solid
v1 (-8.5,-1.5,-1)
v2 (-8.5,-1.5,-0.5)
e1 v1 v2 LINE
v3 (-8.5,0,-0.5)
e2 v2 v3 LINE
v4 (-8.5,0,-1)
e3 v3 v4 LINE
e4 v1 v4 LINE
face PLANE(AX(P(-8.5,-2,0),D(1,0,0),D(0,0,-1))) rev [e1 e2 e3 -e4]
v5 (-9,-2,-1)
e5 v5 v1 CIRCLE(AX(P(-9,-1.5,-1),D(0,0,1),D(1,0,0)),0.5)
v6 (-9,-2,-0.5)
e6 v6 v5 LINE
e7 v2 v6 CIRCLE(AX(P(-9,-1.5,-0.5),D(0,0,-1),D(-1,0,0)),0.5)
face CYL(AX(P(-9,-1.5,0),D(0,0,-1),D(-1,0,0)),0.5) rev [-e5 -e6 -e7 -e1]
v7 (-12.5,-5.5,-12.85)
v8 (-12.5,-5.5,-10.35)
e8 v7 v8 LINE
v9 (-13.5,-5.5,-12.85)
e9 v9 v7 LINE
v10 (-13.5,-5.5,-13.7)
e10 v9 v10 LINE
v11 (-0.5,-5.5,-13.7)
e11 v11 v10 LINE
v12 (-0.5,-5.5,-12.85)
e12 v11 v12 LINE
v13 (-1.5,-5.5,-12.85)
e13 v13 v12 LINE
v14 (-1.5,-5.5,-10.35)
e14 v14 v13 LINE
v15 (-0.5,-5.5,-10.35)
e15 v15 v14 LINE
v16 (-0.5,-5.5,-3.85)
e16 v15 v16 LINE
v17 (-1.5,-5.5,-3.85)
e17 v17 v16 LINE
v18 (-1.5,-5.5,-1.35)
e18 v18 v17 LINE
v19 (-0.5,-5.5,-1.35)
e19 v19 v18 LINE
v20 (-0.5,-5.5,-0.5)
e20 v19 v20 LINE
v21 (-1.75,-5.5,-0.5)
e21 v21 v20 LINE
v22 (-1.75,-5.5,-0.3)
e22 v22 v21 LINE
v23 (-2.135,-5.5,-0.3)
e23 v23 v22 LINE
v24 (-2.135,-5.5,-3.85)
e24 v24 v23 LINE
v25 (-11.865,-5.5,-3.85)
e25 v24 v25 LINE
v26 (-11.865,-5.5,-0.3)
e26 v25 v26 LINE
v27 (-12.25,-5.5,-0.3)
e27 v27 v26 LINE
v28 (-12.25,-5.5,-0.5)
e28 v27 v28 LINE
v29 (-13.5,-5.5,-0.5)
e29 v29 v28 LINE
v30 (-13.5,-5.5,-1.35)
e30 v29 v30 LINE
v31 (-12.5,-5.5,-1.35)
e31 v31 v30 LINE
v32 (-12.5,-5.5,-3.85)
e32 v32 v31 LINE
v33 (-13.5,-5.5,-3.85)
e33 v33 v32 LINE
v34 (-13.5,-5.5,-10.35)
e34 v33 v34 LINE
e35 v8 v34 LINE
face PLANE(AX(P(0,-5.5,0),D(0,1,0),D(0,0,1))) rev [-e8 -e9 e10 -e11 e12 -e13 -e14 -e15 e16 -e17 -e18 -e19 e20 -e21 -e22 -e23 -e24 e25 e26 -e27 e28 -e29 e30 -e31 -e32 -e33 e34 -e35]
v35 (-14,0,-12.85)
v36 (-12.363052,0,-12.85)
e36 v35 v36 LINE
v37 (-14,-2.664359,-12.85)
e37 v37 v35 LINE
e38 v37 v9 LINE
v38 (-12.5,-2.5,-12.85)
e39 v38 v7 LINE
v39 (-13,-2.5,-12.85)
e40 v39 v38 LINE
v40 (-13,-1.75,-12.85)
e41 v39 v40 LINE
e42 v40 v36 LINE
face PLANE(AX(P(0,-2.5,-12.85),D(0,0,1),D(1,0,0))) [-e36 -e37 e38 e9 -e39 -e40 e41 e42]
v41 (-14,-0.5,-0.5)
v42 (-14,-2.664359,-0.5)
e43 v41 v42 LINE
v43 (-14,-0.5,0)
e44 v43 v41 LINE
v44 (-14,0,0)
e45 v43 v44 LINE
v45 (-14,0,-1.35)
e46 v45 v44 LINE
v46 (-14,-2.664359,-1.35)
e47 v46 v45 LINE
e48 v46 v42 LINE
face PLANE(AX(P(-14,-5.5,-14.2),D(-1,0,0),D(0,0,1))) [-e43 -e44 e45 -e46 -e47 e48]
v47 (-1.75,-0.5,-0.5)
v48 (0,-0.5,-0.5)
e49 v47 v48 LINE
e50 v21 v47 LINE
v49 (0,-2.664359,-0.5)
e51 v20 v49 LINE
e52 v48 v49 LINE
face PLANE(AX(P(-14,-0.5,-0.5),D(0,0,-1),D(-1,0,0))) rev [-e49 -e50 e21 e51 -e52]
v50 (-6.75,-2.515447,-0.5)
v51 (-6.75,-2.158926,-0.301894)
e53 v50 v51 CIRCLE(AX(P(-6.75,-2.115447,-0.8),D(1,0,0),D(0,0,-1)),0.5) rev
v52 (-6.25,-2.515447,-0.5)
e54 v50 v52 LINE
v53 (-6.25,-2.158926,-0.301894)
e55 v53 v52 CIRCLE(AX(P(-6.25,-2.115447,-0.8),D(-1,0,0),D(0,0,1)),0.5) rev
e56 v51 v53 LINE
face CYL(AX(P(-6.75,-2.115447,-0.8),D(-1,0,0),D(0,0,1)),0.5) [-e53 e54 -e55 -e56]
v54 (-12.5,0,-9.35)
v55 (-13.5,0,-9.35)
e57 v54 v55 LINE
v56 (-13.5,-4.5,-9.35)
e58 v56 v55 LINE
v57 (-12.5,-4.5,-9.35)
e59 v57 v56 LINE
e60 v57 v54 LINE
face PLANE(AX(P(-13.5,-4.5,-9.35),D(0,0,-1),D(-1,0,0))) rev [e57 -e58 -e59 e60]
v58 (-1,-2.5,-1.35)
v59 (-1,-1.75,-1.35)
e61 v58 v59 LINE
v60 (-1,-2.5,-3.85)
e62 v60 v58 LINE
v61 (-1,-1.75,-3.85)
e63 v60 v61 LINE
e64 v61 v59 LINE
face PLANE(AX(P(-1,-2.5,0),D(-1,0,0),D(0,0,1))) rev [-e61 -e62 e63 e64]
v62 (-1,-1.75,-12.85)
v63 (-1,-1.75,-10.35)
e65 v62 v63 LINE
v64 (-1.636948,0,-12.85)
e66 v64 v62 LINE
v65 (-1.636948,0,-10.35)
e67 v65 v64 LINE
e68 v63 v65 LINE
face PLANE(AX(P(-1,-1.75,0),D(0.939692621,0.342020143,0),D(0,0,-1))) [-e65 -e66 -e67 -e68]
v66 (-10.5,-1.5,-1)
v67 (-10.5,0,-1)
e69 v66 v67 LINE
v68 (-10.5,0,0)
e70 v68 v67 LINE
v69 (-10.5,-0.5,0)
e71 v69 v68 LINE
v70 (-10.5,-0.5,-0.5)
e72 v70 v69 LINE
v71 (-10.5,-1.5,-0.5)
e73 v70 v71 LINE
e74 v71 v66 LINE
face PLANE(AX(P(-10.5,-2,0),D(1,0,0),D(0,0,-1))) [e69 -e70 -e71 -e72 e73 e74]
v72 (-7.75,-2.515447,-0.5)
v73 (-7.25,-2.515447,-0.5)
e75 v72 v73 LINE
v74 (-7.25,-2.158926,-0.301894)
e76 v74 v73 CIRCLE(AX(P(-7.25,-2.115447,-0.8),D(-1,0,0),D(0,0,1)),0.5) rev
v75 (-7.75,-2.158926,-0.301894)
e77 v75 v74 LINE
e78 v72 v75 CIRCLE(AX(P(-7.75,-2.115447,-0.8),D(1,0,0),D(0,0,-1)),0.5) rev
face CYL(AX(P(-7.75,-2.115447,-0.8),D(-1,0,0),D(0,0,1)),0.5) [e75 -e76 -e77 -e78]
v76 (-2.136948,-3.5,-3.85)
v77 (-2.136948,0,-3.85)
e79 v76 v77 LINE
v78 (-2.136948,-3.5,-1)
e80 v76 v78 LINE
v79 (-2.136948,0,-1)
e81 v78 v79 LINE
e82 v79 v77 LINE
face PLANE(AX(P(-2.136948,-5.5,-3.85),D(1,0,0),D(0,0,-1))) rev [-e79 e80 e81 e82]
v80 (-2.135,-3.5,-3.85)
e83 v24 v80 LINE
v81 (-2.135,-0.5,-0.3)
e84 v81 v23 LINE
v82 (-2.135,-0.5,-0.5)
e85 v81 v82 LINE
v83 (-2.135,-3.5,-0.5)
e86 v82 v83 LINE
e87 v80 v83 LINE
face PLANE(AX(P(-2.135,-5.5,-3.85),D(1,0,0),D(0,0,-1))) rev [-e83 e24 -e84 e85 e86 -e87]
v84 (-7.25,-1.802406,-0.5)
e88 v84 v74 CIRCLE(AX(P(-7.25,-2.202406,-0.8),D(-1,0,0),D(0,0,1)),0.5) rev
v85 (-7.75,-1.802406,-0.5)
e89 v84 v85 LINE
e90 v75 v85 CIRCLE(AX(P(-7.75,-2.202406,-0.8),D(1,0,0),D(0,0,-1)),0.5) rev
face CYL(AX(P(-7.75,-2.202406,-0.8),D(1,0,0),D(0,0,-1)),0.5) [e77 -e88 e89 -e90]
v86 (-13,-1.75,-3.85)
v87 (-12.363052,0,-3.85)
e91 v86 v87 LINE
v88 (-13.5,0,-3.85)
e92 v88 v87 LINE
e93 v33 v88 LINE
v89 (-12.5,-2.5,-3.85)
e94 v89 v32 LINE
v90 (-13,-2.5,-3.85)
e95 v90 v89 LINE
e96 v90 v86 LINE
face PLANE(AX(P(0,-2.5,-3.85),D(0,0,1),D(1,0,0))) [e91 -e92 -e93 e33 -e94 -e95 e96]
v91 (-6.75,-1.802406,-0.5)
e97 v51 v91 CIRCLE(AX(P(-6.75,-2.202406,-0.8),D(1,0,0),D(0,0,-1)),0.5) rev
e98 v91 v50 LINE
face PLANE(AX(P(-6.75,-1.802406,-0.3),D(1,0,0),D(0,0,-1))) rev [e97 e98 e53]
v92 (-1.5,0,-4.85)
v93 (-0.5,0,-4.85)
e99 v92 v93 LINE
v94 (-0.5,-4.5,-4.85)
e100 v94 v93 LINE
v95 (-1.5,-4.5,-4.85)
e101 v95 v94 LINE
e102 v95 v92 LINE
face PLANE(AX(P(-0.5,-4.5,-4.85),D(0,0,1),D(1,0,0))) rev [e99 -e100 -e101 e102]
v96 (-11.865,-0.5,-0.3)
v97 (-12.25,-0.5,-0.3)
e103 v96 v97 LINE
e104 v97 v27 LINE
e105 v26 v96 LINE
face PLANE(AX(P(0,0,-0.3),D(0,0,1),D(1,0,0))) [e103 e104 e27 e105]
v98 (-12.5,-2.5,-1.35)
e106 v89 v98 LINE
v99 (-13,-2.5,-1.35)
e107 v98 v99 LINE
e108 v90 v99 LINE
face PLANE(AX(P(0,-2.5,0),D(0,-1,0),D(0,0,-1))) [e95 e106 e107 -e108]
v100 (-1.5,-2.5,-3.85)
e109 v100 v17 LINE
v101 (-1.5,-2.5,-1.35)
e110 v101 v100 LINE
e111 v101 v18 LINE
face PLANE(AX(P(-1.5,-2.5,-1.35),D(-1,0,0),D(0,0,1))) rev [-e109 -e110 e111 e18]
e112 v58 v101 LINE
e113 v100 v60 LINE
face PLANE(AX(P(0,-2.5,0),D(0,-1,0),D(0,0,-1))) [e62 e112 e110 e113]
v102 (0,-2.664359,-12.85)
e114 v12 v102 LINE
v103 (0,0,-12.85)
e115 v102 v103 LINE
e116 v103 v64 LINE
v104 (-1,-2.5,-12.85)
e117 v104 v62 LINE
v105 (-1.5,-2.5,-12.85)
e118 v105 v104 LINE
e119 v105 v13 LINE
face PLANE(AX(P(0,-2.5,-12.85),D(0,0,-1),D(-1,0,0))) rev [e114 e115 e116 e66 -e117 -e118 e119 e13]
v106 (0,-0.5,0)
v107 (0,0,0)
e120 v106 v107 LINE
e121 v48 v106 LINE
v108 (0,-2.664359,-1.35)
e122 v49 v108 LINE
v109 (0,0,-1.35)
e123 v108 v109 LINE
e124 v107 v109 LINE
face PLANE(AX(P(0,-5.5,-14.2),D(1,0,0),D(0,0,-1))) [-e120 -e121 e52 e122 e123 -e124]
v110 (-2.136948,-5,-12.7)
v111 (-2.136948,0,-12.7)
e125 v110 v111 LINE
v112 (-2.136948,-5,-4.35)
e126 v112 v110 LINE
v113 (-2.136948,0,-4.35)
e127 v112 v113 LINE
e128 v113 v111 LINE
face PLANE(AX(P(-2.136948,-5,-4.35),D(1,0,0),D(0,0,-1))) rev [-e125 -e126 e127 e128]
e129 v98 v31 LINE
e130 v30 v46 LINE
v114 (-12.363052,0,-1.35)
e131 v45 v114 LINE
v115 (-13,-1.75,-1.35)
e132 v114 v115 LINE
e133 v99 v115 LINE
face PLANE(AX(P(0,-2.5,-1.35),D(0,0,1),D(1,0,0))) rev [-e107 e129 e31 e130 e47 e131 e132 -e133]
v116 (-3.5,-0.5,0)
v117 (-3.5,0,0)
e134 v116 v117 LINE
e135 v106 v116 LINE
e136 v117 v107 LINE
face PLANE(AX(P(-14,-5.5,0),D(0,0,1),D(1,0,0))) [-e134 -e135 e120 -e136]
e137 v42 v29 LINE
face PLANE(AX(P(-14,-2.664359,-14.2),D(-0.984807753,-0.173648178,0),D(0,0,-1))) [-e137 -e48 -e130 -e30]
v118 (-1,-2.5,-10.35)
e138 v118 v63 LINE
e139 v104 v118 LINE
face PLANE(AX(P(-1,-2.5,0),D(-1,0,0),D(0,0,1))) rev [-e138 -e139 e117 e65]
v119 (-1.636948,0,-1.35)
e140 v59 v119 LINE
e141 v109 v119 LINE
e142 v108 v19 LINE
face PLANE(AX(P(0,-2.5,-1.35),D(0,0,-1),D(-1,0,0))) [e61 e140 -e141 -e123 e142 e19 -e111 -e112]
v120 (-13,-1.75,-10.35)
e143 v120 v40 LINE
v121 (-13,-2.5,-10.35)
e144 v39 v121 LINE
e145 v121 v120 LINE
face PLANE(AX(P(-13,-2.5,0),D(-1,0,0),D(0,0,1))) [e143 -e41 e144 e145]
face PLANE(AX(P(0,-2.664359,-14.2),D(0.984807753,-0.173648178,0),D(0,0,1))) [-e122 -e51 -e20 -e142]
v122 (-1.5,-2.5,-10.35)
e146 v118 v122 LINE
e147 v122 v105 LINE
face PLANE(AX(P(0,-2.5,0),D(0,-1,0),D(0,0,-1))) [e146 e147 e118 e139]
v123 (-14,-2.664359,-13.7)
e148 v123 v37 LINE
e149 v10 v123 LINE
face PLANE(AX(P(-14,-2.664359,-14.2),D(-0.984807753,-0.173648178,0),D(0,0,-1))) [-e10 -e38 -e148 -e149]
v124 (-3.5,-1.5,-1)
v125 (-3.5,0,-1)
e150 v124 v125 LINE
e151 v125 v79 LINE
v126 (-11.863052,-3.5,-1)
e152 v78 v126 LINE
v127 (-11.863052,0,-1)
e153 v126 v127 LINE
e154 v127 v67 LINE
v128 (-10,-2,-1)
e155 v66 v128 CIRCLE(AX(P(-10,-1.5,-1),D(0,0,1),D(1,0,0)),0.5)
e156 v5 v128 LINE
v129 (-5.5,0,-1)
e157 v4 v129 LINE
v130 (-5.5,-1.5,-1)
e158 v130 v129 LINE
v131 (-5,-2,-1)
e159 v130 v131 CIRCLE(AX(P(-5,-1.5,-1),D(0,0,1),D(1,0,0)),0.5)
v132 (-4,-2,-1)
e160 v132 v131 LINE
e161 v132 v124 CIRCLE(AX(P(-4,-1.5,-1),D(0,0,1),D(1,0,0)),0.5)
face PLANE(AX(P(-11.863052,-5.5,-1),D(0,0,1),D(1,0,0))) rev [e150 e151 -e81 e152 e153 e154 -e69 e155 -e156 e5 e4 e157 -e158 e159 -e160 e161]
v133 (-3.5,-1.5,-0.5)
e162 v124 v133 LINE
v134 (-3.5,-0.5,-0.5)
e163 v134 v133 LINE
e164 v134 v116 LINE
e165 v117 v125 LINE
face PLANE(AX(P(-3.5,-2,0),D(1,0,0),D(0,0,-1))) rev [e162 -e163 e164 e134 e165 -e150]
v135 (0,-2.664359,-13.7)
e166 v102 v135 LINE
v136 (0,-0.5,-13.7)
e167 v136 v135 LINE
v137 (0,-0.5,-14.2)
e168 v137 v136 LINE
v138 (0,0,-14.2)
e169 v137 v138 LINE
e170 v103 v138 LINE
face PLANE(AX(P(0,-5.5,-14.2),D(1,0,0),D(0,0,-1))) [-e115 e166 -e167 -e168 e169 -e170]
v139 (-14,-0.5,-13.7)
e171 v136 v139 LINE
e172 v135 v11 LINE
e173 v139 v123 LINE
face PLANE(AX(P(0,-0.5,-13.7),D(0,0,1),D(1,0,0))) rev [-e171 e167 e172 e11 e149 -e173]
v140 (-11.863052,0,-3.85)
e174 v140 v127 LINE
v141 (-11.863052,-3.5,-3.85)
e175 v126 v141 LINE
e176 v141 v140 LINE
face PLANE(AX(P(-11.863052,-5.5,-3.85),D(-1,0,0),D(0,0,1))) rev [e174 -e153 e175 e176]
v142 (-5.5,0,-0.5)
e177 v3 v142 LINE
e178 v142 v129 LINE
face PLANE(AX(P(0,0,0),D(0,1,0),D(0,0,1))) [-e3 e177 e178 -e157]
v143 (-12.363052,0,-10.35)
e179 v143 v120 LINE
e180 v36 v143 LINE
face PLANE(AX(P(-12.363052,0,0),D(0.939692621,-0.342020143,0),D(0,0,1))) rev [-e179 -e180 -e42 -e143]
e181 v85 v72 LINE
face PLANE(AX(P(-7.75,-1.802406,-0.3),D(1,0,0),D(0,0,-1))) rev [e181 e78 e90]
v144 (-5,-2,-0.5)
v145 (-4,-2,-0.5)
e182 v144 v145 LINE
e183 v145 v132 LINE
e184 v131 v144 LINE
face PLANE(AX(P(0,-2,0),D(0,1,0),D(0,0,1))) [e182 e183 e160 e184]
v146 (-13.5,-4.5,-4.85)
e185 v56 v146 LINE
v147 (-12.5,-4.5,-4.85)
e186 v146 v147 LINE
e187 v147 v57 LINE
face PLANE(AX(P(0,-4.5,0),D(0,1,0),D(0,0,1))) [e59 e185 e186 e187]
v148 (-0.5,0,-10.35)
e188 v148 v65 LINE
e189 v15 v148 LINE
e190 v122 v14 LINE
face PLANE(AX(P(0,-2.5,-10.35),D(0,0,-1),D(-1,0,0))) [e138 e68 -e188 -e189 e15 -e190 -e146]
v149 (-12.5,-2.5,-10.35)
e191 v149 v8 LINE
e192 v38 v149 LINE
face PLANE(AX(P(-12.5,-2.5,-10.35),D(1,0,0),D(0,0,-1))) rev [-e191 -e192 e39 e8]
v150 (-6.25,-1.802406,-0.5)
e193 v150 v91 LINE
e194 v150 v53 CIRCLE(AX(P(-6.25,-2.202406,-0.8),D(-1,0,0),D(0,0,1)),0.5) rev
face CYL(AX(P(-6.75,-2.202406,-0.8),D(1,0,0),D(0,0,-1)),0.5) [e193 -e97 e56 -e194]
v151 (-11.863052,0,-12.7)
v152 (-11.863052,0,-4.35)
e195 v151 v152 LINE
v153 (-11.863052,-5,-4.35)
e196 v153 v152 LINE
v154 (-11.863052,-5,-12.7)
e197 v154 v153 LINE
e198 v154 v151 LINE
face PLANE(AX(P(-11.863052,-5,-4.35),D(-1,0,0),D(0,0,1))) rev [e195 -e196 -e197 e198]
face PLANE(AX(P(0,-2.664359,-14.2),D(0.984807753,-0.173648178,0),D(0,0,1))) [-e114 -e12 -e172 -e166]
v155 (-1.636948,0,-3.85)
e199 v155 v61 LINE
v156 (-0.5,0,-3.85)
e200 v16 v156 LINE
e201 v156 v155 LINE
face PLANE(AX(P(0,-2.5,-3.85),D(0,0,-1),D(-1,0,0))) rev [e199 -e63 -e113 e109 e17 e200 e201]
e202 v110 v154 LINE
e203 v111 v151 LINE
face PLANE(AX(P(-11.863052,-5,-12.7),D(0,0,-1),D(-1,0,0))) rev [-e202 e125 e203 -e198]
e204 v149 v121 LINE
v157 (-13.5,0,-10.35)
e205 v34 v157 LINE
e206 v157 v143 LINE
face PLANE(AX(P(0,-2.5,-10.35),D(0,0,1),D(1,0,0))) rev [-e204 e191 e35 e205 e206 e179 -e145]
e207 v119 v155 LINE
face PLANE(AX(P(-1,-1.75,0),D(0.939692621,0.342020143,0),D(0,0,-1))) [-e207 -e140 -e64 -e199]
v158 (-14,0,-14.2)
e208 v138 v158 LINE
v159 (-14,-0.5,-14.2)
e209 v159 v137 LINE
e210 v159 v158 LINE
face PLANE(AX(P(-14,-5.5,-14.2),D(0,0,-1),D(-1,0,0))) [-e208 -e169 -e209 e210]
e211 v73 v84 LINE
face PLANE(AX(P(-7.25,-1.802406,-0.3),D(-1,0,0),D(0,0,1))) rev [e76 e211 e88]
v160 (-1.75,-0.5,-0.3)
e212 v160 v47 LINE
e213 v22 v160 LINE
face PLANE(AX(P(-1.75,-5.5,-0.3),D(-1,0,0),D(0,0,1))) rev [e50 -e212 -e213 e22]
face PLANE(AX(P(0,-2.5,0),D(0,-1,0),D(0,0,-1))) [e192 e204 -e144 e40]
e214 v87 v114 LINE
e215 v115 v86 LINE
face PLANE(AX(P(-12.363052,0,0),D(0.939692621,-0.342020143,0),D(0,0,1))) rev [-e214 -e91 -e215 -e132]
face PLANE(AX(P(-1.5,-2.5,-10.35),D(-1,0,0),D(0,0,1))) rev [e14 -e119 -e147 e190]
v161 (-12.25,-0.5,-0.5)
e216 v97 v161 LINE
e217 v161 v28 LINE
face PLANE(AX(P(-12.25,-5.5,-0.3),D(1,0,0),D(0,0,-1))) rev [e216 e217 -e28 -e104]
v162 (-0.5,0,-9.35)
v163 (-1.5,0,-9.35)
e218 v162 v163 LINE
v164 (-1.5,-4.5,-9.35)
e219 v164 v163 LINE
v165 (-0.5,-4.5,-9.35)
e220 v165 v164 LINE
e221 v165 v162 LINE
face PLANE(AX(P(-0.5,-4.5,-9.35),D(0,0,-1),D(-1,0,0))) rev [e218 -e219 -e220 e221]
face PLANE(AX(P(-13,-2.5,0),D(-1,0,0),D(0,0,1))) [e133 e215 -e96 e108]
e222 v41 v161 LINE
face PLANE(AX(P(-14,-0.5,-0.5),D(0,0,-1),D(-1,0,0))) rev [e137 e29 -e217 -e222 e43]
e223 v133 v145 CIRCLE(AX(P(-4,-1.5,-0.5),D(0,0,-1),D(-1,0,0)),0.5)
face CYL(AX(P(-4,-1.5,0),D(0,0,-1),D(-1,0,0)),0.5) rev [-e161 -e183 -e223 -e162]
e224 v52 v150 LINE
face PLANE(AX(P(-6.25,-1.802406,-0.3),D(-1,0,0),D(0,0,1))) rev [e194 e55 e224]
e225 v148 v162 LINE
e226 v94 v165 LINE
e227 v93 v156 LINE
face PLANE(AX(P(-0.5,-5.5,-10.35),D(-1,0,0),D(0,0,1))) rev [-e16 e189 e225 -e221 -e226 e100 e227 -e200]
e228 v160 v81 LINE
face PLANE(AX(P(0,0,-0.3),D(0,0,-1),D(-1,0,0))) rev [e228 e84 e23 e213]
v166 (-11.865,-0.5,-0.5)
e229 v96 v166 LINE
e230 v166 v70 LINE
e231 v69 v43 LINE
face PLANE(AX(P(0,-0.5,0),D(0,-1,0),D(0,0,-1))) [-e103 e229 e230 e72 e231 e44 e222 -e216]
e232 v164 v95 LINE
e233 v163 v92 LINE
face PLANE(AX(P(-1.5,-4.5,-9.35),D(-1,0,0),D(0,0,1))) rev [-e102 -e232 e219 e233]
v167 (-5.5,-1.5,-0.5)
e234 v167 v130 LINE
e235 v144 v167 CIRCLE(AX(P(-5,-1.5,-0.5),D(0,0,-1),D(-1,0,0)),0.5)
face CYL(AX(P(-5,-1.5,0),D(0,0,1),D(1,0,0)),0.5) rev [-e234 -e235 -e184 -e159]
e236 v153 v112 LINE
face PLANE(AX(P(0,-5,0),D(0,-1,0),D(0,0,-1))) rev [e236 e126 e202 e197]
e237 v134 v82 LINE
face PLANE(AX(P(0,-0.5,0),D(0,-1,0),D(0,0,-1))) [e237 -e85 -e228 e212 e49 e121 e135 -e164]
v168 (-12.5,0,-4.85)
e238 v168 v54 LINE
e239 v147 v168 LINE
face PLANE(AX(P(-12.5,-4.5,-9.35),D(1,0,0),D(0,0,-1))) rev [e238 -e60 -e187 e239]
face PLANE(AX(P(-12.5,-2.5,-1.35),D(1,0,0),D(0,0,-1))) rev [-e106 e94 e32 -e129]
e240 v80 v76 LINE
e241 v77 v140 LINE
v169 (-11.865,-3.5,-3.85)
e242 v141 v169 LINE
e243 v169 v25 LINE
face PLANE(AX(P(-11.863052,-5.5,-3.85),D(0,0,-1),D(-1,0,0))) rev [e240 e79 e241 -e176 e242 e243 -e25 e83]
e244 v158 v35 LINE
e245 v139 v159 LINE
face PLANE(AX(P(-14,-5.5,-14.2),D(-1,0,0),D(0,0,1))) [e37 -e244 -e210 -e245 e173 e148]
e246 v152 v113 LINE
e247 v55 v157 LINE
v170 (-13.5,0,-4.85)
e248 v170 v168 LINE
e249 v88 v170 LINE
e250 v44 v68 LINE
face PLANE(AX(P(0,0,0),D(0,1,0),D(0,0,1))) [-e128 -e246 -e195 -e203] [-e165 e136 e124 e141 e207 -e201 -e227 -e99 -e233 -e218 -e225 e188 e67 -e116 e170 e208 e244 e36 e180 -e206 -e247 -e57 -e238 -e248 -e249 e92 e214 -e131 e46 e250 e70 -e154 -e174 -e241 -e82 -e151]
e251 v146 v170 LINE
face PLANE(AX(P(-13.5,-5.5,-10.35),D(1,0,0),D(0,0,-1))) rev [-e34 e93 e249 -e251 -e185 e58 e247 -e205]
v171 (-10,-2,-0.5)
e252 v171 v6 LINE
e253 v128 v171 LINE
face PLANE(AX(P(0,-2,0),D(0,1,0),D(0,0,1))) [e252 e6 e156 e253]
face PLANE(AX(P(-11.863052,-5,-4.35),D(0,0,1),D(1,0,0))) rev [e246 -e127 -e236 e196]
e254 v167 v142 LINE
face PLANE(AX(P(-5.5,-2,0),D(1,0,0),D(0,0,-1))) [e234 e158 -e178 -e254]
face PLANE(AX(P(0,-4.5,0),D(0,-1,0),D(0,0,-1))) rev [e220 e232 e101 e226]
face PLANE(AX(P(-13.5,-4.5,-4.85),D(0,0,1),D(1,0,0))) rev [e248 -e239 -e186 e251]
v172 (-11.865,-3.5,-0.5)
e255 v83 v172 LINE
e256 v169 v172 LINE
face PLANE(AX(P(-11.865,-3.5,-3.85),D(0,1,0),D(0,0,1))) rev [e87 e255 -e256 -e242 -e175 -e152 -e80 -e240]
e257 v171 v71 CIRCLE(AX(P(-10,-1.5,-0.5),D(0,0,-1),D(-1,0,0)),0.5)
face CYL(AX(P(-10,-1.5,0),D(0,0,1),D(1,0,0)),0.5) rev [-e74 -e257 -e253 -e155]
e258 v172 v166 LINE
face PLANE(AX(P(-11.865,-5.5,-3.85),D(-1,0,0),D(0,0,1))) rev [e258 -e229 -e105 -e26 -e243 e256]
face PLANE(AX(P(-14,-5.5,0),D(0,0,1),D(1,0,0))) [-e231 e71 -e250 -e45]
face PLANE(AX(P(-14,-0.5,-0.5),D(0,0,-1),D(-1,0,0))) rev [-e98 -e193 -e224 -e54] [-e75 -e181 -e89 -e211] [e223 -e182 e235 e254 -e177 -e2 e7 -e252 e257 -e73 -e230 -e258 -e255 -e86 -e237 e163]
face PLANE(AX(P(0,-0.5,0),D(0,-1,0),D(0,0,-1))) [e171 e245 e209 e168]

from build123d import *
from OCP.BRepFilletAPI import BRepFilletAPI_MakeChamfer

# Parameters (mm, degrees)
SKETCH1_W           = 14
SKETCH1_H           = 14.2
BOSS_EXTRUDE2_DEPTH = 5.5
SKETCH2_W           = 1
SKETCH2_H           = 2.5
CUT_EXTRUDE1_DEPTH  = 2.5
SKETCH3_W           = 1.5
SKETCH3_H           = 2.5
CUT_EXTRUDE2_DEPTH  = 3
SKETCH4_W           = 0.5
SKETCH4_H           = 6.5
CUT_EXTRUDE3_DEPTH  = 5.5
SKETCH5_W           = 1
SKETCH5_H           = 4.5
CUT_EXTRUDE4_DEPTH  = 4.5
CHAMFER2_SIZE       = 1.75
CHAMFER2_SIZE2      = 0.63694791
CHAMFER3_SIZE       = 1.75
CHAMFER3_SIZE2      = 0.63694791
SKETCH7_W           = 9.72610418
SKETCH7_H           = 2.85
CUT_EXTRUDE5_DEPTH  = 21.685502169
SKETCH8_W           = 9.72610418
SKETCH8_H           = 8.35
CUT_EXTRUDE6_DEPTH  = 5
CHAMFER4_SIZE       = 0.5
CHAMFER4_SIZE2      = 2.83564091
CHAMFER5_SIZE       = 0.5
CHAMFER5_SIZE2      = 2.83564091
SKETCH9_W           = 14
SKETCH9_H           = 0.5
CUT_EXTRUDE7_DEPTH  = 5
SKETCH11_W          = 2
SKETCH11_H          = 0.5
CUT_EXTRUDE11_DEPTH = 2
FILLET2_R           = 0.5
CUT_EXTRUDE12_START = -3.35
SKETCH12_W          = 9.73
SKETCH12_H          = 2
CUT_EXTRUDE12_DEPTH = 3.35
SKETCH13_W          = 0.5
SKETCH13_H          = 0.713041147
SKETCH13_W_2        = 0.385
SKETCH13_H_2        = 5
BOSS_EXTRUDE3_DEPTH = 0.2
FILLET4_R           = 0.5


with BuildPart() as part:
    # Sketch1 → Boss-Extrude2 (new body)
    with BuildSketch(Plane(origin=(0, 0, 0), x_dir=(1, 0, 0), z_dir=(0, 1, 0))):
        with Locations((-7, 7.1)):
            Rectangle(SKETCH1_W, SKETCH1_H)
    extrude(amount=-BOSS_EXTRUDE2_DEPTH)

    # Sketch2 → Cut-Extrude1 (cut)
    with BuildSketch(Plane(origin=(0, 0, 0), x_dir=(1, 0, 0), z_dir=(0, 1, 0))):
        with Locations((-13.5, 11.6)):
            Rectangle(SKETCH2_W, SKETCH2_H)
        with Locations((-0.5, 11.6)):
            Rectangle(SKETCH2_W, SKETCH2_H)
        with Locations((-13.5, 2.6)):
            Rectangle(SKETCH2_W, SKETCH2_H)
        with Locations((-0.5, 2.6)):
            Rectangle(SKETCH2_W, SKETCH2_H)
    extrude(amount=-CUT_EXTRUDE1_DEPTH, mode=Mode.SUBTRACT)

    # Sketch3 → Cut-Extrude2 (cut)
    with BuildSketch(Plane.XZ.offset(5.5)):
        with Locations((-13.25, -2.6)):
            Rectangle(SKETCH3_W, SKETCH3_H)
        with Locations((-0.75, -2.6)):
            Rectangle(SKETCH3_W, SKETCH3_H)
        with Locations((-0.75, -11.6)):
            Rectangle(SKETCH3_W, SKETCH3_H)
        with Locations((-13.25, -11.6)):
            Rectangle(SKETCH3_W, SKETCH3_H)
    extrude(amount=-CUT_EXTRUDE2_DEPTH, mode=Mode.SUBTRACT)

    # Sketch4 → Cut-Extrude3 (cut)
    with BuildSketch(Plane(origin=(0, 0, 0), x_dir=(1, 0, 0), z_dir=(0, 1, 0))):
        with Locations((-0.25, 7.1)):
            Rectangle(SKETCH4_W, SKETCH4_H)
        with Locations((-13.75, 7.1)):
            Rectangle(SKETCH4_W, SKETCH4_H)
    extrude(amount=-CUT_EXTRUDE3_DEPTH, mode=Mode.SUBTRACT)

    # Sketch5 → Cut-Extrude4 (cut)
    with BuildSketch(Plane(origin=(0, 0, 0), x_dir=(1, 0, 0), z_dir=(0, 1, 0))):
        with Locations((-13, 7.1)):
            Rectangle(SKETCH5_W, SKETCH5_H)
        with Locations((-1, 7.1)):
            Rectangle(SKETCH5_W, SKETCH5_H)
    extrude(amount=-CUT_EXTRUDE4_DEPTH, mode=Mode.SUBTRACT)

    # Chamfer2: one chamfer whose edges measure the first distance from different faces: ONE call of the kernel's chamfer builder (chamfer() names one face for all edges)
    chamfer2_edges_1 = [part.edges().sort_by_distance(p)[0] for p in [
        (-13, 0, -2.6),
    ]]
    chamfer2_side_1 = [part.faces().sort_by_distance(p)[0] for p in [
        (-13, -1.25, -2.6),
    ]]
    chamfer2_edges_2 = [part.edges().sort_by_distance(p)[0] for p in [
        (-13, 0, -11.6),
    ]]
    chamfer2_side_2 = [part.faces().sort_by_distance(p)[0] for p in [
        (-13, -1.25, -11.6),
    ]]
    chamfer2 = BRepFilletAPI_MakeChamfer(part.part.solid().wrapped)
    for e in chamfer2_edges_1:
        chamfer2.Add(CHAMFER2_SIZE, CHAMFER2_SIZE2, e.wrapped, chamfer2_side_1[0].wrapped)  # the first distance lies on this face
    for e in chamfer2_edges_2:
        chamfer2.Add(CHAMFER2_SIZE, CHAMFER2_SIZE2, e.wrapped, chamfer2_side_2[0].wrapped)  # the first distance lies on this face
    add(Compound.cast(chamfer2.Shape()), mode=Mode.REPLACE)

    # Chamfer3: one chamfer whose edges measure the first distance from different faces: ONE call of the kernel's chamfer builder (chamfer() names one face for all edges)
    chamfer3_edges_1 = [part.edges().sort_by_distance(p)[0] for p in [
        (-1, 0, -11.6),
    ]]
    chamfer3_side_1 = [part.faces().sort_by_distance(p)[0] for p in [
        (-1, -1.25, -11.6),
    ]]
    chamfer3_edges_2 = [part.edges().sort_by_distance(p)[0] for p in [
        (-1, 0, -2.6),
    ]]
    chamfer3_side_2 = [part.faces().sort_by_distance(p)[0] for p in [
        (-1, -1.25, -2.6),
    ]]
    chamfer3 = BRepFilletAPI_MakeChamfer(part.part.solid().wrapped)
    for e in chamfer3_edges_1:
        chamfer3.Add(CHAMFER3_SIZE, CHAMFER3_SIZE2, e.wrapped, chamfer3_side_1[0].wrapped)  # the first distance lies on this face
    for e in chamfer3_edges_2:
        chamfer3.Add(CHAMFER3_SIZE, CHAMFER3_SIZE2, e.wrapped, chamfer3_side_2[0].wrapped)  # the first distance lies on this face
    add(Compound.cast(chamfer3.Shape()), mode=Mode.REPLACE)

    # Sketch7 → Cut-Extrude5 (cut, through all)
    with BuildSketch(Plane(origin=(0, 0, 0), x_dir=(1, 0, 0), z_dir=(0, 1, 0))):
        with Locations((-7, 2.425)):
            Rectangle(SKETCH7_W, SKETCH7_H)
    extrude(amount=-CUT_EXTRUDE5_DEPTH, mode=Mode.SUBTRACT)

    # Sketch8 → Cut-Extrude6 (cut)
    with BuildSketch(Plane(origin=(0, 0, 0), x_dir=(1, 0, 0), z_dir=(0, 1, 0))):
        with Locations((-7, 8.525)):
            Rectangle(SKETCH8_W, SKETCH8_H)
    extrude(amount=-CUT_EXTRUDE6_DEPTH, mode=Mode.SUBTRACT)

    # Chamfer4
    chamfer4_edges = [part.edges().sort_by_distance(p)[0] for p in [
        (0, -5.5, -0.675),
        (0, -5.5, -13.525),
    ]]
    chamfer4_side = [part.faces().sort_by_distance(p)[0] for p in [
        (-7, -5.5, -7.966343482),
    ]]
    chamfer(chamfer4_edges, length=CHAMFER4_SIZE, length2=CHAMFER4_SIZE2, reference=chamfer4_side[0])

    # Chamfer5
    chamfer5_edges = [part.edges().sort_by_distance(p)[0] for p in [
        (-14, -5.5, -13.525),
        (-14, -5.5, -0.675),
    ]]
    chamfer5_side = [part.faces().sort_by_distance(p)[0] for p in [
        (-7.06147516, -5.5, -7.974233646),
    ]]
    chamfer(chamfer5_edges, length=CHAMFER5_SIZE, length2=CHAMFER5_SIZE2, reference=chamfer5_side[0])

    # Sketch9 → Cut-Extrude7 (cut)
    with BuildSketch(Plane.XZ.offset(5.5)):
        with Locations((-7, -0.25)):
            Rectangle(SKETCH9_W, SKETCH9_H)
        with Locations((-7, -13.95)):
            Rectangle(SKETCH9_W, SKETCH9_H)
    extrude(amount=-CUT_EXTRUDE7_DEPTH, mode=Mode.SUBTRACT)

    # Sketch11 → Cut-Extrude11 (cut)
    with BuildSketch(Plane(origin=(0, 0, 0), x_dir=(1, 0, 0), z_dir=(0, 1, 0))):
        with Locations((-9.5, 0.75)):
            Rectangle(SKETCH11_W, SKETCH11_H)
        Polygon((-10.5, 0.5), (-10.5, 0), (-3.5, 0), (-3.5, 0.5), (-5.5, 0.5), (-8.5, 0.5), align=None)
        with Locations((-4.5, 0.75)):
            Rectangle(SKETCH11_W, SKETCH11_H)
    extrude(amount=-CUT_EXTRUDE11_DEPTH, mode=Mode.SUBTRACT)

    # Fillet2
    fillet2_edges = [part.edges().sort_by_distance(p)[0] for p in [
        (-10.5, -2, -0.75),
        (-5.5, -2, -0.75),
        (-3.5, -2, -0.75),
        (-8.5, -2, -0.75),
    ]]
    fillet(fillet2_edges, radius=FILLET2_R)

    # Sketch12 → Cut-Extrude12 (cut)
    with BuildSketch(Plane.XY.offset(-0.5).offset(CUT_EXTRUDE12_START)):
        with Locations((-7, -4.5)):
            Rectangle(SKETCH12_W, SKETCH12_H)
    extrude(amount=CUT_EXTRUDE12_DEPTH, mode=Mode.SUBTRACT)

    # Sketch13 → Boss-Extrude3 (add)
    with BuildSketch(Plane.XY.offset(-0.5)):
        with Locations((-7.5, -2.158926418)):
            Rectangle(SKETCH13_W, SKETCH13_H)
        with Locations((-6.5, -2.158926418)):
            Rectangle(SKETCH13_W, SKETCH13_H)
        with Locations((-1.9425, -3)):
            Rectangle(SKETCH13_W_2, SKETCH13_H_2)
        with Locations((-12.0575, -3)):
            Rectangle(SKETCH13_W_2, SKETCH13_H_2)
    extrude(amount=BOSS_EXTRUDE3_DEPTH)

    # Fillet4
    # the kernel refuses this fillet: 0.5 mm, written as the material it takes off along each edge
    with BuildSketch(Plane(origin=(-8.75, -1.802405844, -0.3), x_dir=(0, -2.6074697955836492e-11, -1.0), z_dir=(1, 0, 0)), Plane(origin=(-7.75, -1.802405844, -0.3), x_dir=(0, -2.6074697955836492e-11, -1.0), z_dir=(1, 0, 0))) as fillet4_piece_1:
        with BuildLine():
            CenterArc((0.5, -0.4), FILLET4_R, 126.869897647, 53.130102355)
            Line((0, -0.4), (-0.01, -0.4))
            Line((-0.01, -0.4), (-0.01, 0))
            Line((-0.01, 0), (0, 0.01))
            ThreePointArc((0, 0.01), (0.1, 0.01), (0.194, 0.008))
            Line((0.194, 0.008), (0.2, 0))
        make_face()
    extrude(amount=2.5, mode=Mode.SUBTRACT)
    with BuildSketch(Plane(origin=(-5.25, -2.515446991, -0.3), x_dir=(0, 1, 0), z_dir=(-1, 0, 0)), Plane(origin=(-6.25, -2.515446991, -0.3), x_dir=(0, 1, 0), z_dir=(-1, 0, 0))) as fillet4_piece_2:
        with BuildLine():
            CenterArc((0.4, 0.5), FILLET4_R, 216.869897645, 53.130102355)
            Line((0, 0.2), (-0.008, 0.194))
            ThreePointArc((-0.008, 0.194), (-0.01, 0.1), (-0.01, 0))
            Line((-0.01, 0), (0, -0.01))
            Line((0, -0.01), (0.4, -0.01))
            Line((0.4, -0.01), (0.4, 0))
        make_face()
    extrude(amount=2.5, mode=Mode.SUBTRACT)


solid = part.part
